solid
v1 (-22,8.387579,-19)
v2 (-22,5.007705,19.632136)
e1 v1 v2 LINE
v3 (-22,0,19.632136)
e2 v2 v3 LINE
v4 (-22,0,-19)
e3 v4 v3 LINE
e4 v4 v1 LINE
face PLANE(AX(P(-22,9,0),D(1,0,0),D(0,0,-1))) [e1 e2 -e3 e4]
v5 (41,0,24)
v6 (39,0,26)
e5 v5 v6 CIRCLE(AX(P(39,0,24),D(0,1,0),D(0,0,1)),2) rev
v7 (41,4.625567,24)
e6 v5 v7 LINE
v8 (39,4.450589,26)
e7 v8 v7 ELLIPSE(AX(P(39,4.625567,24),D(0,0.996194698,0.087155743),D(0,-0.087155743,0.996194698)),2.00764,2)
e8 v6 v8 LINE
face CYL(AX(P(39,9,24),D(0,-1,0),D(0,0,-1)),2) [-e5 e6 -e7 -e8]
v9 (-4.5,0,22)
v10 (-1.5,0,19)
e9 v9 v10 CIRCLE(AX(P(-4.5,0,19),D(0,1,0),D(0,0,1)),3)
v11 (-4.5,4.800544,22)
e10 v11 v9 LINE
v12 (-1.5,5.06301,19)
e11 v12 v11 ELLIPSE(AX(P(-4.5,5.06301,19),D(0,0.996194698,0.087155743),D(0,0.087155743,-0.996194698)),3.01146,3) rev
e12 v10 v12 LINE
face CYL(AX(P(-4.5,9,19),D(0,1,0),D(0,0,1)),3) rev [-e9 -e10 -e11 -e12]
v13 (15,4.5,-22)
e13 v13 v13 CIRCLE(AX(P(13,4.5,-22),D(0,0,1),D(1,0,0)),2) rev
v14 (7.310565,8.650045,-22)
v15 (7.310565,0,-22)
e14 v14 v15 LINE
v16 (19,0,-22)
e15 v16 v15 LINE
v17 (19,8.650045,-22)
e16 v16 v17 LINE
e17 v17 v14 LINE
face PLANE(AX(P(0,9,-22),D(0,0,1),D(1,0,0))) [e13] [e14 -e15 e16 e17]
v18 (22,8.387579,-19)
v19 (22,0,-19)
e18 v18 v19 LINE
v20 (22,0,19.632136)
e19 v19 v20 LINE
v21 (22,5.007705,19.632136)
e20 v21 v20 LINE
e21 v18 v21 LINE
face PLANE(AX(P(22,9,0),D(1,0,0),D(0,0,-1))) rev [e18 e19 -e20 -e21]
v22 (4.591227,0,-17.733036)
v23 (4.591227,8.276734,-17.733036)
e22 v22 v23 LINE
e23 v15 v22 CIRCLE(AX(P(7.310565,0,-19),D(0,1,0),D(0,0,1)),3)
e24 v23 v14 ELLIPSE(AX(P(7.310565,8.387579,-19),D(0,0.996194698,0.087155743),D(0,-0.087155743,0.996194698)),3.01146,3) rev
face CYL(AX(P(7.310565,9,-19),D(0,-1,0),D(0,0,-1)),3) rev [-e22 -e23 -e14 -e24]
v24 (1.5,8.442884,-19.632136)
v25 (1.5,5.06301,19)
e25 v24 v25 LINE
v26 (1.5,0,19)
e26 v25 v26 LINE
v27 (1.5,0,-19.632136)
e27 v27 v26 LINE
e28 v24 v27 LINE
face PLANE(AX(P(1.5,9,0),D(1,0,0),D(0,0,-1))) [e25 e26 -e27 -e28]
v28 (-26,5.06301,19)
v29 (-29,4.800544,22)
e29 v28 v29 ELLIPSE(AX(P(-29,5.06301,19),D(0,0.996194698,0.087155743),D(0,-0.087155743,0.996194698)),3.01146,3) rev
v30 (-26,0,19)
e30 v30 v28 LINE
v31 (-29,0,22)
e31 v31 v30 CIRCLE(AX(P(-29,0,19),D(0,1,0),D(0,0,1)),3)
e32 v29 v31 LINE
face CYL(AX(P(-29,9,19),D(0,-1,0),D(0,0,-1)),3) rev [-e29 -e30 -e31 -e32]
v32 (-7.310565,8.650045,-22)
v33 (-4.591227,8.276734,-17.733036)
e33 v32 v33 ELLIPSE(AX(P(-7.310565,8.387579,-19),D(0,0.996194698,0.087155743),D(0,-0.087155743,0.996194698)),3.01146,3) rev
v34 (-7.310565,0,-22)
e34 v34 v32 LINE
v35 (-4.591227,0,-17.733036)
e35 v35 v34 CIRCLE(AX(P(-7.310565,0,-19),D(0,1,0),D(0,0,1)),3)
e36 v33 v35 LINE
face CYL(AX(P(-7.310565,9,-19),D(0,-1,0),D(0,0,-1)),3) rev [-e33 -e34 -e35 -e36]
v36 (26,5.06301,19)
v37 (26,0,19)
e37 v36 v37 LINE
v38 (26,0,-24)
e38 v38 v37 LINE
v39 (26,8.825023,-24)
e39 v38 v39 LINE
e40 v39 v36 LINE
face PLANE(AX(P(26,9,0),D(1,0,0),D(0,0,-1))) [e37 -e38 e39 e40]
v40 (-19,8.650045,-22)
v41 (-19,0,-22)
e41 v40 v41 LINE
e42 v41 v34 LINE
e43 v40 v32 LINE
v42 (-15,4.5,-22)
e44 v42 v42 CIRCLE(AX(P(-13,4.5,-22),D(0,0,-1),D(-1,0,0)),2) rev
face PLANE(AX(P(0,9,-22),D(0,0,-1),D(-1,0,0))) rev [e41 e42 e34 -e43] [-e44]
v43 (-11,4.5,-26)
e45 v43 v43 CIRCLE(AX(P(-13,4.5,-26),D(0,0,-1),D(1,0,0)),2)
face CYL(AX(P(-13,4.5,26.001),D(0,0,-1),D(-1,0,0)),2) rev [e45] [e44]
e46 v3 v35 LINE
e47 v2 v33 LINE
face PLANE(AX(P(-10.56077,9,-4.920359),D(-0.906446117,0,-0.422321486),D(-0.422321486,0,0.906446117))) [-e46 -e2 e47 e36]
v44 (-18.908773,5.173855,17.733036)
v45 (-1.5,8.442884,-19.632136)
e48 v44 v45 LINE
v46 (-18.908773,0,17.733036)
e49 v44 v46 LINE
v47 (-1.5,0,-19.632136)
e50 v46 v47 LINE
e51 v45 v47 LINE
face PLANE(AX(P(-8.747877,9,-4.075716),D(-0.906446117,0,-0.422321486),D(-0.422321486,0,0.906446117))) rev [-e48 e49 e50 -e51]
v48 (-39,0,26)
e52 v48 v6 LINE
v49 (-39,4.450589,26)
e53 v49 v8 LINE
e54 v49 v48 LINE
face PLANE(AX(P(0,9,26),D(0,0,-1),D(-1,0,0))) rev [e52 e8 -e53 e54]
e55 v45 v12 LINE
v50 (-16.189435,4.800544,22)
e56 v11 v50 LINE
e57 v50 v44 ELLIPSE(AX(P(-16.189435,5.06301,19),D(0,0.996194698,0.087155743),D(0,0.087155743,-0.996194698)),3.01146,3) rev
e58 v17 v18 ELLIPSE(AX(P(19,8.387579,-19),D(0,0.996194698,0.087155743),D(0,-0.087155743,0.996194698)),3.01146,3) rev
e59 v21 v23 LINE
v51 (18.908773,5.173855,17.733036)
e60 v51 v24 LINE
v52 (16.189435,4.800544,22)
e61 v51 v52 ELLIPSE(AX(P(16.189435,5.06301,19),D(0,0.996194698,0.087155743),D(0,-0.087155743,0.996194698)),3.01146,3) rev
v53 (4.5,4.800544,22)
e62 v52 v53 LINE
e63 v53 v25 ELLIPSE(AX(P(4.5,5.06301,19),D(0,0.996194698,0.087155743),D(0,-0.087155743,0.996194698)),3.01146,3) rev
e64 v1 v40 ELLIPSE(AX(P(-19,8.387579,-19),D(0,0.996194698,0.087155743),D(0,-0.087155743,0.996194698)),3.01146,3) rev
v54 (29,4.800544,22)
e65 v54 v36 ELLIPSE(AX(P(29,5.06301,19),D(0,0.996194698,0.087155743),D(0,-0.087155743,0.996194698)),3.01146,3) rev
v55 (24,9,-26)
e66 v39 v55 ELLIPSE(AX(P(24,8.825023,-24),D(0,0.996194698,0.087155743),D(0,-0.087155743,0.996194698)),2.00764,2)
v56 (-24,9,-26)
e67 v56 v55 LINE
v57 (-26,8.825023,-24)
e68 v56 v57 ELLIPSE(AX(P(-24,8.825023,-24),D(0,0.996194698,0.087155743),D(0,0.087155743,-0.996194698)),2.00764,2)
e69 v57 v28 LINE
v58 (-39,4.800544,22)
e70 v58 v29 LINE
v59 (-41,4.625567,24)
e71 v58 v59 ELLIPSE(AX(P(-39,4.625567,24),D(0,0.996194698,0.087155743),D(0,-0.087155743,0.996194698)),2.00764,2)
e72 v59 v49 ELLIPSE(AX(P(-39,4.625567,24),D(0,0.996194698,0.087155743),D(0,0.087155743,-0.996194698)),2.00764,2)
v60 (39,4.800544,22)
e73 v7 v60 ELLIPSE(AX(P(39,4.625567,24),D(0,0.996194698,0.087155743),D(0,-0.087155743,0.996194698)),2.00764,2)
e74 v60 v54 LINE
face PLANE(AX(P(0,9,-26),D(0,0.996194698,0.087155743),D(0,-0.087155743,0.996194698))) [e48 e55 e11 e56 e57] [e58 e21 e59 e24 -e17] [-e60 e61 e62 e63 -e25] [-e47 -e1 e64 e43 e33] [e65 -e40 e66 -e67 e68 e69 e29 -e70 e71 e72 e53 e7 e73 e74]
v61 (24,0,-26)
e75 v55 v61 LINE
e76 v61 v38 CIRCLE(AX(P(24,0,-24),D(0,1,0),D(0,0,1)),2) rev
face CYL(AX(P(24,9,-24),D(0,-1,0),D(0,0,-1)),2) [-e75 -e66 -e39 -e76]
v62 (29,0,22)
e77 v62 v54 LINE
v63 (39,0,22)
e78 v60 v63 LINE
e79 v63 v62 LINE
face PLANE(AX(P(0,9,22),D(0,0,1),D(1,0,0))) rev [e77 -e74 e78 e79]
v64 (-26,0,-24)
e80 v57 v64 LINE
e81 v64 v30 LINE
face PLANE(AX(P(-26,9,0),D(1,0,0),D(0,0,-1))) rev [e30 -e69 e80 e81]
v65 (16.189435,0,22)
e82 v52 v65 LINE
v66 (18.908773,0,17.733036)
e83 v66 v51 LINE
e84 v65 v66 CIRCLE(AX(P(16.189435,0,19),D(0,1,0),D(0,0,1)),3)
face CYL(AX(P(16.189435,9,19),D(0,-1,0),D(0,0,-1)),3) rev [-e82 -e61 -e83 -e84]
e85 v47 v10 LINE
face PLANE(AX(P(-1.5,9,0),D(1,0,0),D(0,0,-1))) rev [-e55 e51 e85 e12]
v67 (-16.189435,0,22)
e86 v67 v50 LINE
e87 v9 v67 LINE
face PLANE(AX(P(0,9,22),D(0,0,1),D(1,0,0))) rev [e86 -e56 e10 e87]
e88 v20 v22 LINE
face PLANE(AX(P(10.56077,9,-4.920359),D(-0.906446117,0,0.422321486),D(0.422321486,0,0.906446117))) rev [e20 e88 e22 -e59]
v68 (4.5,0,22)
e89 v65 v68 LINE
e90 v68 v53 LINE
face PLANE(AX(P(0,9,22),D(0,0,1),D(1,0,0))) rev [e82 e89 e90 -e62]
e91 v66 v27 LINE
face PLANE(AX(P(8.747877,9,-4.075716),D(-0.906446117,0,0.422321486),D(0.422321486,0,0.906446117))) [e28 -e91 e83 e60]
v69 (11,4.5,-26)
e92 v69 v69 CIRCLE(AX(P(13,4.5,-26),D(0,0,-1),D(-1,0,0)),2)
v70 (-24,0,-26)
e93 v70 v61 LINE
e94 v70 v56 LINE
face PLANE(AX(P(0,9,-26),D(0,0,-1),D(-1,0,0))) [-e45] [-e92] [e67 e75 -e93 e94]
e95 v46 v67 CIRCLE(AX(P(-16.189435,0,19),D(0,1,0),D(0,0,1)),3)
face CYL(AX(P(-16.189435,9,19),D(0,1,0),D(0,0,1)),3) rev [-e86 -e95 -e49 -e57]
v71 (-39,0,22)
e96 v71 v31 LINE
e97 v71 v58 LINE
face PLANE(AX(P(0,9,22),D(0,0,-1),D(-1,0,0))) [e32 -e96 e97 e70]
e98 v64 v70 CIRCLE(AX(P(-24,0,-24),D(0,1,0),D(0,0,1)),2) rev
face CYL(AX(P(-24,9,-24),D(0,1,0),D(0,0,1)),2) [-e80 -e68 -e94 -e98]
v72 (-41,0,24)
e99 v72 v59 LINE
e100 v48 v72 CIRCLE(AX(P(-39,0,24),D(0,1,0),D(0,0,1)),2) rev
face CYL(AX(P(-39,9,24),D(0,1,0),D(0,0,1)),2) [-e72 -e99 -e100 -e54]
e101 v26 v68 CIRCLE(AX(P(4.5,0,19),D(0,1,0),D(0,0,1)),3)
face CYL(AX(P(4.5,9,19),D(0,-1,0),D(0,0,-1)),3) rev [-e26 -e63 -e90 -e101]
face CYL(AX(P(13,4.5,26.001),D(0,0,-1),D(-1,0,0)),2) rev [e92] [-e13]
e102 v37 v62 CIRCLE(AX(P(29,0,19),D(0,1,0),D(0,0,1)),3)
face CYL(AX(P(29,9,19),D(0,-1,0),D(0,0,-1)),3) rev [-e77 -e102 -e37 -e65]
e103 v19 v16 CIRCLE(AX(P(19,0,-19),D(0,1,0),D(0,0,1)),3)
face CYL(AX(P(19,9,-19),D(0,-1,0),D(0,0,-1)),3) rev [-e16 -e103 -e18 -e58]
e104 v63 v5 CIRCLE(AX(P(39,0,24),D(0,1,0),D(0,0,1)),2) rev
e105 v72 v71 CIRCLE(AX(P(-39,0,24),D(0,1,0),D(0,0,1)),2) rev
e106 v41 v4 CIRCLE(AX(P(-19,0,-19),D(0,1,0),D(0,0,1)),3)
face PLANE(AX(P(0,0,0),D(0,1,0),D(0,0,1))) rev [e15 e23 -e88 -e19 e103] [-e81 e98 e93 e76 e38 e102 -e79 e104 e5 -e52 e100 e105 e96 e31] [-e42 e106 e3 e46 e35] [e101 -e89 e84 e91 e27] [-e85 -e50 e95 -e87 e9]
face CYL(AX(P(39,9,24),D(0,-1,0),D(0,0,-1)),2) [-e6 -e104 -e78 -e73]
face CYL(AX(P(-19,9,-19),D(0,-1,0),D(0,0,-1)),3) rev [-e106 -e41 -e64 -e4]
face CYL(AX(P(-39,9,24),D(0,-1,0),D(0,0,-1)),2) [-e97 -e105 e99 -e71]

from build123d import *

# Parameters (mm, degrees)
BOSS_EXTRUDE1_DEPTH = 9
FILLET1_R           = 3
FILLET2_R           = 2
CUT_EXTRUDE1_REACH  = 68.828
SKETCH2_R           = 2
DRAFT1_START        = 6.699702971
DRAFT1_OUTLINE_W    = 84
DRAFT1_OUTLINE_H    = 55
DRAFT1_DEPTH        = 4.532098623


# Read off the part's stored shape, not the designer's step: Draft1
with BuildPart() as part:
    # Sketch1 → Boss-Extrude1 (new body)
    # profile 1 of 4: a face of its own
    with BuildSketch(Plane(origin=(0, 0, 0), x_dir=(1, 0, 0), z_dir=(0, 1, 0))):
        Polygon((26, 26), (-26, 26), (-26, -22), (-41, -22), (-41, -26), (-26, -26), (26, -26), (41, -26), (41, -22), (26, -22), align=None)
        Polygon((-22, -19.632135629), (-22, 22), (-2.603209536, 22), (-1.5, 22), (-1.5, 19.632135629), (-1.5, -22), (-20.896790464, -22), (-22, -22), align=None, mode=Mode.SUBTRACT)
        Polygon((1.5, 19.632135629), (1.5, 22), (2.603209536, 22), (22, 22), (22, -19.632135629), (22, -22), (20.896790464, -22), (1.5, -22), align=None, mode=Mode.SUBTRACT)
    # profile 2 of 4: a face of its own
    with BuildSketch(Plane(origin=(0, 0, 0), x_dir=(1, 0, 0), z_dir=(0, 1, 0))):
        Polygon((26, 26), (-26, 26), (-26, -22), (-41, -22), (-41, -26), (-26, -26), (26, -26), (41, -26), (41, -22), (26, -22), align=None)
        Polygon((-22, -19.632135629), (-22, 22), (-2.603209536, 22), (-1.5, 22), (-1.5, 19.632135629), (-1.5, -22), (-20.896790464, -22), (-22, -22), align=None, mode=Mode.SUBTRACT)
        Polygon((1.5, 19.632135629), (1.5, 22), (2.603209536, 22), (22, 22), (22, -19.632135629), (22, -22), (20.896790464, -22), (1.5, -22), align=None, mode=Mode.SUBTRACT)
    # profile 3 of 4: a face of its own
    with BuildSketch(Plane(origin=(0, 0, 0), x_dir=(1, 0, 0), z_dir=(0, 1, 0))):
        Polygon((-1.5, 22), (-2.603209536, 22), (-22, -19.632135629), (-22, -22), (-20.896790464, -22), (-1.5, 19.632135629), align=None)
    # profile 4 of 4: a face of its own
    with BuildSketch(Plane(origin=(0, 0, 0), x_dir=(1, 0, 0), z_dir=(0, 1, 0))):
        Polygon((2.603209536, 22), (1.5, 22), (1.5, 19.632135629), (20.896790464, -22), (22, -22), (22, -19.632135629), align=None)
    extrude(amount=BOSS_EXTRUDE1_DEPTH)

    # Fillet1
    fillet1_edges = [part.edges().sort_by_distance(p)[0] for p in [
        (-26, 4.5, 22),
        (26, 4.5, 22),
        (22, 4.5, -22),
        (2.603209536, 4.5, -22),
        (-2.603209536, 4.5, -22),
        (-22, 4.5, -22),
        (20.896790464, 4.5, 22),
        (1.5, 4.5, 22),
        (-20.896790464, 4.5, 22),
        (-1.5, 4.5, 22),
    ]]
    fillet(fillet1_edges, radius=FILLET1_R)

    # Fillet2
    fillet2_edges = [part.edges().sort_by_distance(p)[0] for p in [
        (-26, 4.5, -26),
        (26, 4.5, -26),
        (41, 4.5, 26),
        (41, 4.5, 22),
        (-41, 4.5, 22),
        (-41, 4.5, 26),
    ]]
    fillet(fillet2_edges, radius=FILLET2_R - 0.0001)  # a hair under: the kernel refuses the full size

    # Sketch2 → Cut-Extrude1 (cut, up to next)
    with BuildSketch(Plane(origin=(0, 0, -26), x_dir=(-1, 0, 0), z_dir=(0, 0, -1)), mode=Mode.PRIVATE) as cut_extrude1_sk1:
        with Locations((-13, 4.5)):
            Circle(SKETCH2_R)
    cut_extrude1_tool1 = extrude(cut_extrude1_sk1.sketch, amount=-CUT_EXTRUDE1_REACH, mode=Mode.PRIVATE) & part.part
    # Sketch2 → Cut-Extrude1 (cut, up to next)
    with BuildSketch(Plane(origin=(0, 0, -26), x_dir=(-1, 0, 0), z_dir=(0, 0, -1)), mode=Mode.PRIVATE) as cut_extrude1_sk2:
        with Locations((13, 4.5)):
            Circle(SKETCH2_R)
    cut_extrude1_tool2 = extrude(cut_extrude1_sk2.sketch, amount=-CUT_EXTRUDE1_REACH, mode=Mode.PRIVATE) & part.part
    add(cut_extrude1_tool1.solids().sort_by_distance((13, 4.5, -26))[0], mode=Mode.SUBTRACT)
    add(cut_extrude1_tool2.solids().sort_by_distance((-13, 4.5, -26))[0], mode=Mode.SUBTRACT)

    # Draft1 outline → Draft1 (cut)
    with BuildSketch(Plane(origin=(0, 0, 0), x_dir=(1, 0, 0), z_dir=(0, 0.9961946980917455, 0.08715574274765815)).offset(DRAFT1_START)):
        with Locations((0, 0.5)):
            Rectangle(DRAFT1_OUTLINE_W, DRAFT1_OUTLINE_H)
    extrude(amount=DRAFT1_DEPTH, mode=Mode.SUBTRACT)


solid = part.part
